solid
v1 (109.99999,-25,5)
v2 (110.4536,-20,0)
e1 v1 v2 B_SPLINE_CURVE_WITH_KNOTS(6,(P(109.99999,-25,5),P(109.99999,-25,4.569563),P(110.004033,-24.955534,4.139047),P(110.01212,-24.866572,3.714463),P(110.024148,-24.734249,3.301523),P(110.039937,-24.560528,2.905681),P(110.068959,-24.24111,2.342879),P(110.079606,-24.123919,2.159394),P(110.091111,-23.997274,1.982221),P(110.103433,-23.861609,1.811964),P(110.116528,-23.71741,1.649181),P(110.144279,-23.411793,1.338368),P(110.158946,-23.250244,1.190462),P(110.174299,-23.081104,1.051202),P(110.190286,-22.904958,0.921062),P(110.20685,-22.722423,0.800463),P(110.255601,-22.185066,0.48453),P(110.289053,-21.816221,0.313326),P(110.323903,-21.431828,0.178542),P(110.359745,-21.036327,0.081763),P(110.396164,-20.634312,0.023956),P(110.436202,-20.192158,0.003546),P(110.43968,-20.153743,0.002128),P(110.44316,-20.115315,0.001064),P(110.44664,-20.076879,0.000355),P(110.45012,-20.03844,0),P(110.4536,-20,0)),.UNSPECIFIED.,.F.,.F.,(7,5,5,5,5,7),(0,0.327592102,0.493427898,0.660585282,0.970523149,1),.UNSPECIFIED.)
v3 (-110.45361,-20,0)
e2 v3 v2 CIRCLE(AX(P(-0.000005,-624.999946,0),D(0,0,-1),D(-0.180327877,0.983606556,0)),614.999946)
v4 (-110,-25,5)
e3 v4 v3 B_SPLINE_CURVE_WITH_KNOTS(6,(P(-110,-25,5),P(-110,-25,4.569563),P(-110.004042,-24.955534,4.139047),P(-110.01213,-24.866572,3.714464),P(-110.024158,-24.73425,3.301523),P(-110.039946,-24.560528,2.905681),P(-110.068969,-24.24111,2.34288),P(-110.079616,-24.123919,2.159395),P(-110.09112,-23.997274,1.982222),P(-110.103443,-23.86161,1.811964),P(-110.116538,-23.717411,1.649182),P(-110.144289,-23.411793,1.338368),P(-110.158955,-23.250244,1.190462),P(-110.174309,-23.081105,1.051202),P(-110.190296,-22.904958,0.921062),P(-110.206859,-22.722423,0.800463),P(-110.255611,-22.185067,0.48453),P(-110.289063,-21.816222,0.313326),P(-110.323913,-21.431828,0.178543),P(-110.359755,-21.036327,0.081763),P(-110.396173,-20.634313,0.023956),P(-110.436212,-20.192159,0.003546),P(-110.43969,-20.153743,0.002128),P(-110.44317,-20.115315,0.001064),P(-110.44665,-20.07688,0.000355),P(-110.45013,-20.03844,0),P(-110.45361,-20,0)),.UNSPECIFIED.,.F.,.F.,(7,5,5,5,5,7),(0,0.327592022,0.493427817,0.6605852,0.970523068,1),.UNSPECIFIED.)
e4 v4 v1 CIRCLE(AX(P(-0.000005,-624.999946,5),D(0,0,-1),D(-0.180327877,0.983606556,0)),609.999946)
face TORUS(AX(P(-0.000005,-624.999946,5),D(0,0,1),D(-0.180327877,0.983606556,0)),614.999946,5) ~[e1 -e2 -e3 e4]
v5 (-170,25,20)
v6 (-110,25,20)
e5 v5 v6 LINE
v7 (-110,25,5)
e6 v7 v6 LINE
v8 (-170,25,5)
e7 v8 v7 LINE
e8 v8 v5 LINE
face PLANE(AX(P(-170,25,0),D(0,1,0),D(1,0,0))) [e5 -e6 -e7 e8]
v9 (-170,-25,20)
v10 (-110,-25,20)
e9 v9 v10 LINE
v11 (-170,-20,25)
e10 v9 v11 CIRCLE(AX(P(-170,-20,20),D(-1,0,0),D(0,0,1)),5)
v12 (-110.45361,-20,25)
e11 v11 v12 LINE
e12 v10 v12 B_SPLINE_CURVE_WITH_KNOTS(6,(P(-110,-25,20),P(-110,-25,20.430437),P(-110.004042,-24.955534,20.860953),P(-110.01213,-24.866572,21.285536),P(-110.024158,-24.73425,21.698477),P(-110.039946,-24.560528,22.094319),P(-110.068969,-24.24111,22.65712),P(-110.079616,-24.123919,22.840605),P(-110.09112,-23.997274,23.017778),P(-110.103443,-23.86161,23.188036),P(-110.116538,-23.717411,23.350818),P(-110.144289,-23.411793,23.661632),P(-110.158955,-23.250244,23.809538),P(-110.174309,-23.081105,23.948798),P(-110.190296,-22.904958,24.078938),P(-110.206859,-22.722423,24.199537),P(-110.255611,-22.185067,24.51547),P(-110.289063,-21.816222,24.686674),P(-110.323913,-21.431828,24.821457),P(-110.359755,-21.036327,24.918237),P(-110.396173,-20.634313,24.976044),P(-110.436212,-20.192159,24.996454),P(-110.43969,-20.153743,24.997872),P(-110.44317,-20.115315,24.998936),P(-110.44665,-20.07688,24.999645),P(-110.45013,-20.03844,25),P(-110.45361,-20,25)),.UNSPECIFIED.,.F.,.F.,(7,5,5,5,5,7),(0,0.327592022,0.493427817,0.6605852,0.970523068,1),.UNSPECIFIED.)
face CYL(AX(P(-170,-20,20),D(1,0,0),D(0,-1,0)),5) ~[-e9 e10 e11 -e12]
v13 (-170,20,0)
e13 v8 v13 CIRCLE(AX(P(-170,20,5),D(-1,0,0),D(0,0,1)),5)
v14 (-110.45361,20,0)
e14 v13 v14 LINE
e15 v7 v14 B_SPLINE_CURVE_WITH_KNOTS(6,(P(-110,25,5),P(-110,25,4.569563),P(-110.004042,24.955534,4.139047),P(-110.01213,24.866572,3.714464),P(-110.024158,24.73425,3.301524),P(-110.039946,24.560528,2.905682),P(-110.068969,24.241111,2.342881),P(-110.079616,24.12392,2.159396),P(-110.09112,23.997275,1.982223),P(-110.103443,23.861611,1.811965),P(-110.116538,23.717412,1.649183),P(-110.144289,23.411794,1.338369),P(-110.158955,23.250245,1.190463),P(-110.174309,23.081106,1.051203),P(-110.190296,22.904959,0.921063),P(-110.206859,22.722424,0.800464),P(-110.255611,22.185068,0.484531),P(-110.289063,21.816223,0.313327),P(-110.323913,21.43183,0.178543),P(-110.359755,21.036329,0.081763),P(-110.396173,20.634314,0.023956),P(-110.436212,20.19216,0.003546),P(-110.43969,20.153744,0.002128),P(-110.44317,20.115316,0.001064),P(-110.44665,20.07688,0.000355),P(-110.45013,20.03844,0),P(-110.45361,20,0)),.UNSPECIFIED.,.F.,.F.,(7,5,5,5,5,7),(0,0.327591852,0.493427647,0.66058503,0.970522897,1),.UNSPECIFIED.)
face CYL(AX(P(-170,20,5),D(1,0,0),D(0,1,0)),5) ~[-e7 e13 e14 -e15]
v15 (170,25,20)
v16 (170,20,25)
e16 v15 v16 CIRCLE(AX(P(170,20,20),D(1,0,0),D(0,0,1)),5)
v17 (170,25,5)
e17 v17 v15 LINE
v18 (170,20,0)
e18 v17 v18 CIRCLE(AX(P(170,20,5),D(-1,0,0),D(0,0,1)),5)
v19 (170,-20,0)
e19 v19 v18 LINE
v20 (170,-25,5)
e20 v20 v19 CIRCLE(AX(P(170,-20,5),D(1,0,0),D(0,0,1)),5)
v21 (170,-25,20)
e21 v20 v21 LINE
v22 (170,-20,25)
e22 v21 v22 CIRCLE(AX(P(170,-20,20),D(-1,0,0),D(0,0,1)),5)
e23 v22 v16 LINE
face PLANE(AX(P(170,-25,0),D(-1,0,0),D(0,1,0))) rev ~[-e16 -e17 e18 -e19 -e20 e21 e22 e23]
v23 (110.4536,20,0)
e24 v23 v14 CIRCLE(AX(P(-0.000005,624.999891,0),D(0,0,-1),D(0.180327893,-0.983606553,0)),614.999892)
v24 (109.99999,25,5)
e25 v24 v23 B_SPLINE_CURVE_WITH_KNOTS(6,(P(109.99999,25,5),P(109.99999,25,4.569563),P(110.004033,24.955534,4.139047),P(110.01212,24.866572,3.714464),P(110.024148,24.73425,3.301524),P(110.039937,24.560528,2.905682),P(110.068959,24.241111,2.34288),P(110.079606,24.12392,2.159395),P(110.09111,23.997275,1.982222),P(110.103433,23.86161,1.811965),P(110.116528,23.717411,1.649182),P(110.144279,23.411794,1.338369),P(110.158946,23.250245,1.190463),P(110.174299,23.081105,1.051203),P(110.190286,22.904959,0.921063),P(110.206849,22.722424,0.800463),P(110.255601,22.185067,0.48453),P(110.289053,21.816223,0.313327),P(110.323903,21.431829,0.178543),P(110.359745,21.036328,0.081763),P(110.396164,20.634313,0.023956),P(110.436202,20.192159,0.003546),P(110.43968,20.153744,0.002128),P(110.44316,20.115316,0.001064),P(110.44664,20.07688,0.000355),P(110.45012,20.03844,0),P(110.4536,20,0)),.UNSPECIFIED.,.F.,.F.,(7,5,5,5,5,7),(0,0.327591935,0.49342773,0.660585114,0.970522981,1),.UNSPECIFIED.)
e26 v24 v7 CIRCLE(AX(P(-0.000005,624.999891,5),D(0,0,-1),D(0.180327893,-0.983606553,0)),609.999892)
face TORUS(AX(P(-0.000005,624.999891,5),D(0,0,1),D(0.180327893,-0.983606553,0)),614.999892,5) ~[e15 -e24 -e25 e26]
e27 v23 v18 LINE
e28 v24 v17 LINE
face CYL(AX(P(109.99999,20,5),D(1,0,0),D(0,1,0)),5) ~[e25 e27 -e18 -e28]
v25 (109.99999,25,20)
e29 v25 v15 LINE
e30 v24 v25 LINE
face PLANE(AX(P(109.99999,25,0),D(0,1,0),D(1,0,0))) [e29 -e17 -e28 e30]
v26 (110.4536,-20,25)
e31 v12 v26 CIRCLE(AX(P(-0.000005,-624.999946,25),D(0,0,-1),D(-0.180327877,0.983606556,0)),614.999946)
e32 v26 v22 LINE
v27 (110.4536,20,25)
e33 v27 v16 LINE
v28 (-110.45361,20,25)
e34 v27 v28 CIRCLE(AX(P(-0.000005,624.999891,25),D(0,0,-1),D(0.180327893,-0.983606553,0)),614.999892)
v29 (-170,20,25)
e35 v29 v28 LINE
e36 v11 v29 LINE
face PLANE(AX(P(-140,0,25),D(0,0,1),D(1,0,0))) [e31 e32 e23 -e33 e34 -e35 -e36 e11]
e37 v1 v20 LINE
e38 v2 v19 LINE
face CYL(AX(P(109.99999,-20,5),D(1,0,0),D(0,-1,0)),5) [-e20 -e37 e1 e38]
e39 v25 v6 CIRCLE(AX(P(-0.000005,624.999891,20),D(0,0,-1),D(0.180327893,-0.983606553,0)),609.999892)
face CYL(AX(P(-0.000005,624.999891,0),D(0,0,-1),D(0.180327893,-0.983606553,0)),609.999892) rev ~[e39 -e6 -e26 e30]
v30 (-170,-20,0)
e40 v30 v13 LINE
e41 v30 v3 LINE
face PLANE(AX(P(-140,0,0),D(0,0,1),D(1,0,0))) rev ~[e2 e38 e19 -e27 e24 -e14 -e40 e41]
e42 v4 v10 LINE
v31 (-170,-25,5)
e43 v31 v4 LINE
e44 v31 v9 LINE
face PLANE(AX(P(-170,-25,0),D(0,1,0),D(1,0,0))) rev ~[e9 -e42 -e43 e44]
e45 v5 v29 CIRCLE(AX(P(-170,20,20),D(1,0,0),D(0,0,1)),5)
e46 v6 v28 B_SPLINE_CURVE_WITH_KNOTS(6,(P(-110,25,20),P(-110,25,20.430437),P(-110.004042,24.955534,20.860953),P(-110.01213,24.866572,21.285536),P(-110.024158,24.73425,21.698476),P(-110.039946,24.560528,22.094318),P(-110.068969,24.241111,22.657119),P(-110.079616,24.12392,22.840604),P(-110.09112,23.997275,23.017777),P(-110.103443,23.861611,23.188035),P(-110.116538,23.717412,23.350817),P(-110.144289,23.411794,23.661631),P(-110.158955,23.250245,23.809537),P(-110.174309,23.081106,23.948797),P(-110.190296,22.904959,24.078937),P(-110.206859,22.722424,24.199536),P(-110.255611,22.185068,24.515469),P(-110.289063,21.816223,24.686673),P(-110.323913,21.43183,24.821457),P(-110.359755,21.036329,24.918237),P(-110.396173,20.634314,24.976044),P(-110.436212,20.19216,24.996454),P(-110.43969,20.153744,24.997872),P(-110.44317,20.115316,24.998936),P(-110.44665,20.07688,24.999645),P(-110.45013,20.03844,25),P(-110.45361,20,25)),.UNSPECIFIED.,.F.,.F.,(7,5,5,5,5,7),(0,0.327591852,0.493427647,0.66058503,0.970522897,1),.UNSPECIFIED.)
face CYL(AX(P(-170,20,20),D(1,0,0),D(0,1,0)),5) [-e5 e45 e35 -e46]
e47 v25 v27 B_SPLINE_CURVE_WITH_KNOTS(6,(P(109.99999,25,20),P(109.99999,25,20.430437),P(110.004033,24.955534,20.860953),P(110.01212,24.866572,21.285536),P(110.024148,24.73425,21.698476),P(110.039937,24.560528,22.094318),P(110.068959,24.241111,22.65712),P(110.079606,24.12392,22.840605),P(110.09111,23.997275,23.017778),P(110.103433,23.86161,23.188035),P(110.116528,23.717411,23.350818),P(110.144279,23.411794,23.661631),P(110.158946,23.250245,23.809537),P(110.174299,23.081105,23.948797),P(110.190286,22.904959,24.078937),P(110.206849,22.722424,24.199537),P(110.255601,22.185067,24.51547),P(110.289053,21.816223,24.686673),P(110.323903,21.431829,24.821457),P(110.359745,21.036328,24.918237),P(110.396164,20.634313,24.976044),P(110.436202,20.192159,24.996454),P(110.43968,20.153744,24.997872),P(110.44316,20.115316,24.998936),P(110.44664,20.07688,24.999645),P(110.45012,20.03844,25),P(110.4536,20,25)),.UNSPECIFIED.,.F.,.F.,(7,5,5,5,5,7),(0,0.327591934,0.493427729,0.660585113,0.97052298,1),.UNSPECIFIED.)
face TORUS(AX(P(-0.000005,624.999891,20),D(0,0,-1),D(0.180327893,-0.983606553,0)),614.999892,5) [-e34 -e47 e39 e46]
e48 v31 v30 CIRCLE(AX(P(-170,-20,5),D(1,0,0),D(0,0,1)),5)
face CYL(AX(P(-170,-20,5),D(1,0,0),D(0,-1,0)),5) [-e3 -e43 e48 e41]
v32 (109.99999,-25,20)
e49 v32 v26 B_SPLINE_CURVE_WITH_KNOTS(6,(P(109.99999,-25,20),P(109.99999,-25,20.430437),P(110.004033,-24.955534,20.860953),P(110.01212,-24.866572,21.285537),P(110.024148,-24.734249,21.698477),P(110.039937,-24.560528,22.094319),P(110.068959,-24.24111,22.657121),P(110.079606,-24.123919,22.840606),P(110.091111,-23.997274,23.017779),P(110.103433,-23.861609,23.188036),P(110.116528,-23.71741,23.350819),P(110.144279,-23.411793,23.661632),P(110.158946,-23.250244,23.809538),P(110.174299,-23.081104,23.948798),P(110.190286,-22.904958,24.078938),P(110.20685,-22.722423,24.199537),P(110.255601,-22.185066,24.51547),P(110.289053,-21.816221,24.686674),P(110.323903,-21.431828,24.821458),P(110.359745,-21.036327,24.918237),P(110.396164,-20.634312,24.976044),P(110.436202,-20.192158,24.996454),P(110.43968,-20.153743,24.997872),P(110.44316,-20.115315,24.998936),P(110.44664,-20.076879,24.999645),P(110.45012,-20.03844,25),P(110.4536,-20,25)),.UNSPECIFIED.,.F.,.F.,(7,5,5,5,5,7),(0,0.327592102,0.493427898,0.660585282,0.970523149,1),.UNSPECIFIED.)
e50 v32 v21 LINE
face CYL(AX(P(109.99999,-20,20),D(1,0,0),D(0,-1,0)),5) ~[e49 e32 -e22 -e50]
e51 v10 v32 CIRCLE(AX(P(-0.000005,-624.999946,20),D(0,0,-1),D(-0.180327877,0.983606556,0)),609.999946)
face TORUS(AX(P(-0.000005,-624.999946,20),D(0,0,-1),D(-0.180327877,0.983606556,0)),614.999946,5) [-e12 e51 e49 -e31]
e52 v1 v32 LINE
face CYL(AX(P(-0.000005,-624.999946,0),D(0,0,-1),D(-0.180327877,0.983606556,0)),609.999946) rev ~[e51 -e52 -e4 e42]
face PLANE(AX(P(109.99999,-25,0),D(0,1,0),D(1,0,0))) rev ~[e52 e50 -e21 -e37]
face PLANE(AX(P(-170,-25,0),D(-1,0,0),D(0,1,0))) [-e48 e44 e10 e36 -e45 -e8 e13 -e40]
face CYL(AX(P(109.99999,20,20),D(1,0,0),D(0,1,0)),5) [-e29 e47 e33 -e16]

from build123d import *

# Parameters (mm, degrees)
F0_W     = 60
F0_H     = 50
F0_W_2   = 60.0000097896
F1_DEPTH = 25
F2_R     = 5


# Not quite as in the source:
# - ends of sketch curves that miss each other by under 0.0002 mm in the source are joined


with BuildPart() as f1:
    # F0 (on Top) → F1 (new body)
    with BuildSketch(Plane.XY):
        with Locations((-140, 0)):
            Rectangle(F0_W, F0_H)
        with BuildLine():
            Line((-110, 25), (-110, -25))
            ThreePointArc((-110, -25), (-4.8948e-06, -15), (109.9999902104, -25))
            Line((109.9999902104, -25), (109.9999902104, 25))
            ThreePointArc((109.9999902104, 25), (0, 14.9999991026), (-110, 25))
        make_face()
        with Locations((139.9999951052, 0)):
            Rectangle(F0_W_2, F0_H)
    extrude(amount=F1_DEPTH)

    # F2
    f2_edges = [f1.edges().sort_by_distance(p)[0] for p in [
        (-140, -25, 25),
        (-5e-06, -15, 25),
        (139.999995, -25, 25),
        (139.999995, 25, 25),
        (-5e-06, 14.999999, 25),
        (-140, 25, 25),
        (-140, -25, 0),
        (-5e-06, -15, 0),
        (139.999995, -25, 0),
        (-140, 25, 0),
        (-5e-06, 14.999999, 0),
        (139.999995, 25, 0),
    ]]
    fillet(f2_edges, radius=F2_R)


solid = f1.part
